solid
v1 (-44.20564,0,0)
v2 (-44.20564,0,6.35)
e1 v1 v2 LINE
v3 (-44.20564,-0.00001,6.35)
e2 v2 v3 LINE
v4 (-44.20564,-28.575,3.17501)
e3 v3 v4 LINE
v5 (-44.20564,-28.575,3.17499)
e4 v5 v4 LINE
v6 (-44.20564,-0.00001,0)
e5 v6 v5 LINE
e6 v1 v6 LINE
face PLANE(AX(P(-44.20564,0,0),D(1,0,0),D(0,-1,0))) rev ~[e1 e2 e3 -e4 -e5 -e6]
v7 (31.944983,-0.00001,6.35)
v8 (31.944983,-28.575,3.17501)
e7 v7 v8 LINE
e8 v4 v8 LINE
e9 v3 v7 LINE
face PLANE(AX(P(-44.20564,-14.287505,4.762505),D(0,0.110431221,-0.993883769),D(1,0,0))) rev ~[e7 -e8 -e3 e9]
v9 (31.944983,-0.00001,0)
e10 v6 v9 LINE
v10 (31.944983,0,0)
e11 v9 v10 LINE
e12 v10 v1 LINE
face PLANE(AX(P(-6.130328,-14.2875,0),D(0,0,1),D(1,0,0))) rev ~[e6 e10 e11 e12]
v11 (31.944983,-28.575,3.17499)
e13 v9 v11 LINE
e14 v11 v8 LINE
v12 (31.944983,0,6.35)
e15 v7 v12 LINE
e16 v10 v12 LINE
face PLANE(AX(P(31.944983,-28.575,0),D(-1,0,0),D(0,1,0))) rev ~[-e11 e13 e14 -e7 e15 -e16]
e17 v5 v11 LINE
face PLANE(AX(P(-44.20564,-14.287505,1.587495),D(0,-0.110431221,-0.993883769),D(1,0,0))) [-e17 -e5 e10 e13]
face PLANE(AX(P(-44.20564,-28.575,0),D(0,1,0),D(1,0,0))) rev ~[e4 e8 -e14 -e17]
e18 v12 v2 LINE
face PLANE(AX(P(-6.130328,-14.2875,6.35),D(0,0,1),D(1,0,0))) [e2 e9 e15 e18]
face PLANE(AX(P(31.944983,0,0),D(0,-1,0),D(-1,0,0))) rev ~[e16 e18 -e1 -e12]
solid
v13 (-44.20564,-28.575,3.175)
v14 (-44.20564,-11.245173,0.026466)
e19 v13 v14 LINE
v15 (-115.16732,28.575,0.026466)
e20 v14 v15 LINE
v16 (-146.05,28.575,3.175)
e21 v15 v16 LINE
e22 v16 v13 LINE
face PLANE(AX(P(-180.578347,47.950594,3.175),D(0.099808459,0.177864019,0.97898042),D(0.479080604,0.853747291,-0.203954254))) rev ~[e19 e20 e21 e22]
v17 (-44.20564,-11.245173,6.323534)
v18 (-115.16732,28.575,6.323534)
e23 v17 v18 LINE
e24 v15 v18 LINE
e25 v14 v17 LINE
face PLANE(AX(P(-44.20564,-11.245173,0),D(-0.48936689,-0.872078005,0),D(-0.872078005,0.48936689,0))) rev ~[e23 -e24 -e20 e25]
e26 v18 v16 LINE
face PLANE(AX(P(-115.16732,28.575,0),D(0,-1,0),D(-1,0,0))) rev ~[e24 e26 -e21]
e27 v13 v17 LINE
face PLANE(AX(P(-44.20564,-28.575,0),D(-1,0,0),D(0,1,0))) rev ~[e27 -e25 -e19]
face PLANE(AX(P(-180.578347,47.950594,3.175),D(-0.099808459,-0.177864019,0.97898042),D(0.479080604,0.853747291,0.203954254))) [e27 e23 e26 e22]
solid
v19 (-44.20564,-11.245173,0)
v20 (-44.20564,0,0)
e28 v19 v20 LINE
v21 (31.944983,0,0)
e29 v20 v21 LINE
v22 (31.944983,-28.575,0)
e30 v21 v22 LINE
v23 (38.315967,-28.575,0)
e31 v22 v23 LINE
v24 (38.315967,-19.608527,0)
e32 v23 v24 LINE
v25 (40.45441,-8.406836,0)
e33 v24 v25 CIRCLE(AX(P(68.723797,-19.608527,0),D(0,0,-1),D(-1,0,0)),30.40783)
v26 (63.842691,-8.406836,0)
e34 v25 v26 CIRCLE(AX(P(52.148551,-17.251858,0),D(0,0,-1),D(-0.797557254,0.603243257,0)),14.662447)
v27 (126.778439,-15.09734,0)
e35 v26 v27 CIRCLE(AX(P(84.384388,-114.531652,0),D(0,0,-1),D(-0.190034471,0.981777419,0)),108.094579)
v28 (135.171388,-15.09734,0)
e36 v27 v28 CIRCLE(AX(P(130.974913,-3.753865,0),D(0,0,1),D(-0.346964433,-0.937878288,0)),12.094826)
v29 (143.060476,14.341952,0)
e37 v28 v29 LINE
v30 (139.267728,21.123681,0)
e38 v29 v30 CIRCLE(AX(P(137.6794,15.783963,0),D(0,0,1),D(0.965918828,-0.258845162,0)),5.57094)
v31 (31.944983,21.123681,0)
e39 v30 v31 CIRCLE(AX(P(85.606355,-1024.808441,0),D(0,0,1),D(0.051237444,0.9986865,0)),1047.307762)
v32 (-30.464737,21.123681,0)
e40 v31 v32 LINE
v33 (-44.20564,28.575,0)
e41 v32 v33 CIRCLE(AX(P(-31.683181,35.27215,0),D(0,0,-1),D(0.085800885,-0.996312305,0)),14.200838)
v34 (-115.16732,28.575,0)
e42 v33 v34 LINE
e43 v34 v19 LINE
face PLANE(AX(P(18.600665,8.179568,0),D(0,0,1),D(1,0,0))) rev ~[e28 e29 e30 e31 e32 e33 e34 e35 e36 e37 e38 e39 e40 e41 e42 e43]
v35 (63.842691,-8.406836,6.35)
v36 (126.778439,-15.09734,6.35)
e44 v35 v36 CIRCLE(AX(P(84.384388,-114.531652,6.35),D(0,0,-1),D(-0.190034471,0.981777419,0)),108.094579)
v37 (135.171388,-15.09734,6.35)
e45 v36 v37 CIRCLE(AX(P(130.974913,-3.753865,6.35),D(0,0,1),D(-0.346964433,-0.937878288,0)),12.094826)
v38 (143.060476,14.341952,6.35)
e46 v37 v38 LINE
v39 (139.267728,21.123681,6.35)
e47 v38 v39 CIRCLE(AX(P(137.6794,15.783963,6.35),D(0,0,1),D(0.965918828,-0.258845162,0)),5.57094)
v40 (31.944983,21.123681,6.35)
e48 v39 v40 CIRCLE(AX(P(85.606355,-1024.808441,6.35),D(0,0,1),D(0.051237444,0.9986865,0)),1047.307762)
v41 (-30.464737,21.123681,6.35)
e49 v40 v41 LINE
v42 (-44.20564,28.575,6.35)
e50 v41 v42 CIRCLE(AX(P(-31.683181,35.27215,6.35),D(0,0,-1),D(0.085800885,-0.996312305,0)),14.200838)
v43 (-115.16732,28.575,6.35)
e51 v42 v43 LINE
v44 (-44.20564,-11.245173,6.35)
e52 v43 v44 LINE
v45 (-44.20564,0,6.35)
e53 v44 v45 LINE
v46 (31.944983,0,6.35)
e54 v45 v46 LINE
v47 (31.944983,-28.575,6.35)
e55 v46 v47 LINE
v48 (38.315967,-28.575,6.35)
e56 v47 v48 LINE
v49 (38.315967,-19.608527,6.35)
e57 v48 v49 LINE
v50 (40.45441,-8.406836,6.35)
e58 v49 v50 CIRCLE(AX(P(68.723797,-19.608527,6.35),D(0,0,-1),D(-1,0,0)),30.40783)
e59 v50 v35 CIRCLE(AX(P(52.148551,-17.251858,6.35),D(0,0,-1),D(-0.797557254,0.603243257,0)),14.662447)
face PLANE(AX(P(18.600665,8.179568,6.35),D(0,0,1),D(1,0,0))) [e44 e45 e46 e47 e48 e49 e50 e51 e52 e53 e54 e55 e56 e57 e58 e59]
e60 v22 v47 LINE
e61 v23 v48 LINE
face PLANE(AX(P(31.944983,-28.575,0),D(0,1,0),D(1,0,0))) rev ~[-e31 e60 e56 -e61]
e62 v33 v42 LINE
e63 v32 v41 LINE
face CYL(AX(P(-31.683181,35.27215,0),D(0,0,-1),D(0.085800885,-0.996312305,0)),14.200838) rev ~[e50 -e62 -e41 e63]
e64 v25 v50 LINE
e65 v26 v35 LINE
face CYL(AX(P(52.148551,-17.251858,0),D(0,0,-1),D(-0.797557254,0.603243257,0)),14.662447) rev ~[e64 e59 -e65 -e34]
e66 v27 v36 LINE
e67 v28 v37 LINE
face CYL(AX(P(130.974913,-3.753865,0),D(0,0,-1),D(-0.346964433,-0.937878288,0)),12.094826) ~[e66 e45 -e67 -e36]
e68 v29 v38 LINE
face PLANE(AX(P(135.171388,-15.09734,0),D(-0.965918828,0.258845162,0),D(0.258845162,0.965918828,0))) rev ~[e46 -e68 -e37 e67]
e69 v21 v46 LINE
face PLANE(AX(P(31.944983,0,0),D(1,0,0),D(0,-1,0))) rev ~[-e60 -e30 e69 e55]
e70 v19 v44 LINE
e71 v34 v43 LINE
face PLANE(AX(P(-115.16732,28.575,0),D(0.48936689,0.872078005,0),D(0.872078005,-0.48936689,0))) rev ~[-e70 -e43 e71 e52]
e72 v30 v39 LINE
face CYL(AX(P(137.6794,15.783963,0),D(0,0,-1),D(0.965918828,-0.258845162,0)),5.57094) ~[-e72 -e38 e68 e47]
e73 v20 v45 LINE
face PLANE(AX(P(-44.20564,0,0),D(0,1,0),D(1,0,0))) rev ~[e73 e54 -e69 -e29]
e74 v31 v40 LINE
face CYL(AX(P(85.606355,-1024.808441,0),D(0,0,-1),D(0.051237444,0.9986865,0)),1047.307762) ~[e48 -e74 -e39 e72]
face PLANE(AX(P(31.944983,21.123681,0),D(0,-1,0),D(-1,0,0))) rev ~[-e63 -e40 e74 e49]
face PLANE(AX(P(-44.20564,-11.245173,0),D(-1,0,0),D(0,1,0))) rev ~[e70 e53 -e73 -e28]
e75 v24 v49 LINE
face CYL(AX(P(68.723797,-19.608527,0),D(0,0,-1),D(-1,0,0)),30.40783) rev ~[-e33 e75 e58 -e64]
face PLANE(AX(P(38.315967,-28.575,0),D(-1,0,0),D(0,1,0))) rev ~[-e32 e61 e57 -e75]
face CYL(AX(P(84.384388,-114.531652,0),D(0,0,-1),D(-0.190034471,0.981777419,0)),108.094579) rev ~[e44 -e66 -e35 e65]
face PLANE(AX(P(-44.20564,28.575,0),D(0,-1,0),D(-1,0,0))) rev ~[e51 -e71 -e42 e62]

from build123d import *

# Parameters (mm, degrees)
F1_DEPTH    = 6.35
F2_DEPTH    = 6.35
F3_T1_DEPTH = 195.9699169872
F4_DEPTH    = 6.35
F5_SIZE2    = 3.17499
F5_SIZE     = 28.57499
F5_2_SIZE2  = 3.17499
F5_2_SIZE   = 28.57499


# Not quite as in the source:
# - a fillet or chamfer that OpenCascade refuses, or shapes differently, is made with other operations: its cross-section is extruded or revolved along the edge and cut away or added
# - a fillet or chamfer is up to 0.001 mm smaller than in the source, because OpenCascade refuses the exact size


with BuildPart() as f1:
    # F0 (on Top) → F1 (new body)
    with BuildSketch(Plane.XY):
        with BuildLine():
            Line((31.9449827075, -10.0934877992), (31.9449827075, -28.575))
            Line((31.9449827075, -28.575), (38.3159667253, -28.575))
            Line((38.3159667253, -28.575), (38.3159667253, -19.608527422))
            ThreePointArc((38.3159667253, -19.608527422), (38.8553616261, -13.9065356822), (40.4544100165, -8.4068356082))
            ThreePointArc((40.4544100165, -8.4068356082), (52.1485507488, -2.5894110081), (63.8426914811, -8.4068356082))
            ThreePointArc((63.8426914811, -8.4068356082), (95.8112011226, -7.0427415694), (126.7784386873, -15.0973401847))
            ThreePointArc((126.7784386873, -15.0973401847), (130.9749132386, -15.8486915066), (135.1713877899, -15.0973401847))
            Line((135.1713877899, -15.0973401847), (143.0604755878, 14.3419522792))
            ThreePointArc((143.0604755878, 14.3419522792), (142.541612074, 18.5032028423), (139.2677277327, 21.1236812174))
            ThreePointArc((139.2677277327, 21.1236812174), (85.6063552201, 22.499320446), (31.9449827075, 21.1236812174))
            Line((31.9449827075, 21.1236812174), (-30.4647367448, 21.1236812174))
            ThreePointArc((-30.4647367448, 21.1236812174), (-38.4526509093, 22.7886386215), (-44.2056395113, 28.575))
            Line((-44.2056395113, 28.575), (-115.1673197746, 28.575))
            Line((-115.1673197746, 28.575), (-44.2056395113, -11.245172738))
            Line((-44.2056395113, -11.245172738), (-44.2056395113, 0))
            Line((-44.2056395113, 0), (31.9449827075, 0))
            Line((31.9449827075, 0), (31.9449827075, -10.0934877992))
        make_face()
    extrude(amount=F1_DEPTH)


with BuildPart() as f2:
    # F0 (on Top) → F2 (new body)
    with BuildSketch(Plane.XY):
        Polygon((-146.05, 28.575), (-44.2056395113, -28.575), (-44.2056395113, -11.245172738), (-115.1673197746, 28.575), align=None)
    extrude(amount=F2_DEPTH)

    # F3: chamfer of 3.175 x 15.24 on 2 edges, made by hand

    # F3_s2 → F3_t1 (cut)
    with BuildSketch(Plane(origin=(-157.7971410428, 88.547923197, 0), x_dir=(0, 0, 1), z_dir=(0.8720780049, -0.4893668903, 0))):
        Polygon((3.175, 46.5524053311), (6.35, 31.3124053311), (6.35, 46.5524053311), align=None)
        Polygon((3.175, 46.5524053311), (0, 31.3124053311), (0, 46.5524053311), align=None)
    extrude(amount=F3_T1_DEPTH, mode=Mode.SUBTRACT)


with BuildPart() as f4:
    # F0 (on Top) → F4 (new body)
    with BuildSketch(Plane.XY):
        Polygon((-44.2056395113, -11.245172738), (-44.2056395113, -28.575), (31.9449827075, -28.575), (31.9449827075, -10.0934877992), (31.9449827075, 0), (-44.2056395113, 0), align=None)
    extrude(amount=F4_DEPTH)

    # F5 (size 28.575 and 3.175 in the source; OpenCascade refuses exactly that, so slightly less here)
    f5_edges = [f4.edges().sort_by_distance(p)[0] for p in [
        (-6.130328, -28.575, 6.35),
    ]]
    f5_side = f4.faces().sort_by_distance((-6.130328, -14.2875, 6.35))[0]
    chamfer(f5_edges, length=F5_SIZE, length2=F5_SIZE2, reference=f5_side)

    # F5#2 (size 28.575 and 3.175 in the source; OpenCascade refuses exactly that, so slightly less here)
    f5_2_edges = [f4.edges().sort_by_distance(p)[0] for p in [
        (-6.130328, -28.575, 0),
    ]]
    f5_2_side = f4.faces().sort_by_distance((-6.130328, -14.2875, 0))[0]
    chamfer(f5_2_edges, length=F5_2_SIZE, length2=F5_2_SIZE2, reference=f5_2_side)


solid = Compound([f1.part, f2.part, f4.part])
